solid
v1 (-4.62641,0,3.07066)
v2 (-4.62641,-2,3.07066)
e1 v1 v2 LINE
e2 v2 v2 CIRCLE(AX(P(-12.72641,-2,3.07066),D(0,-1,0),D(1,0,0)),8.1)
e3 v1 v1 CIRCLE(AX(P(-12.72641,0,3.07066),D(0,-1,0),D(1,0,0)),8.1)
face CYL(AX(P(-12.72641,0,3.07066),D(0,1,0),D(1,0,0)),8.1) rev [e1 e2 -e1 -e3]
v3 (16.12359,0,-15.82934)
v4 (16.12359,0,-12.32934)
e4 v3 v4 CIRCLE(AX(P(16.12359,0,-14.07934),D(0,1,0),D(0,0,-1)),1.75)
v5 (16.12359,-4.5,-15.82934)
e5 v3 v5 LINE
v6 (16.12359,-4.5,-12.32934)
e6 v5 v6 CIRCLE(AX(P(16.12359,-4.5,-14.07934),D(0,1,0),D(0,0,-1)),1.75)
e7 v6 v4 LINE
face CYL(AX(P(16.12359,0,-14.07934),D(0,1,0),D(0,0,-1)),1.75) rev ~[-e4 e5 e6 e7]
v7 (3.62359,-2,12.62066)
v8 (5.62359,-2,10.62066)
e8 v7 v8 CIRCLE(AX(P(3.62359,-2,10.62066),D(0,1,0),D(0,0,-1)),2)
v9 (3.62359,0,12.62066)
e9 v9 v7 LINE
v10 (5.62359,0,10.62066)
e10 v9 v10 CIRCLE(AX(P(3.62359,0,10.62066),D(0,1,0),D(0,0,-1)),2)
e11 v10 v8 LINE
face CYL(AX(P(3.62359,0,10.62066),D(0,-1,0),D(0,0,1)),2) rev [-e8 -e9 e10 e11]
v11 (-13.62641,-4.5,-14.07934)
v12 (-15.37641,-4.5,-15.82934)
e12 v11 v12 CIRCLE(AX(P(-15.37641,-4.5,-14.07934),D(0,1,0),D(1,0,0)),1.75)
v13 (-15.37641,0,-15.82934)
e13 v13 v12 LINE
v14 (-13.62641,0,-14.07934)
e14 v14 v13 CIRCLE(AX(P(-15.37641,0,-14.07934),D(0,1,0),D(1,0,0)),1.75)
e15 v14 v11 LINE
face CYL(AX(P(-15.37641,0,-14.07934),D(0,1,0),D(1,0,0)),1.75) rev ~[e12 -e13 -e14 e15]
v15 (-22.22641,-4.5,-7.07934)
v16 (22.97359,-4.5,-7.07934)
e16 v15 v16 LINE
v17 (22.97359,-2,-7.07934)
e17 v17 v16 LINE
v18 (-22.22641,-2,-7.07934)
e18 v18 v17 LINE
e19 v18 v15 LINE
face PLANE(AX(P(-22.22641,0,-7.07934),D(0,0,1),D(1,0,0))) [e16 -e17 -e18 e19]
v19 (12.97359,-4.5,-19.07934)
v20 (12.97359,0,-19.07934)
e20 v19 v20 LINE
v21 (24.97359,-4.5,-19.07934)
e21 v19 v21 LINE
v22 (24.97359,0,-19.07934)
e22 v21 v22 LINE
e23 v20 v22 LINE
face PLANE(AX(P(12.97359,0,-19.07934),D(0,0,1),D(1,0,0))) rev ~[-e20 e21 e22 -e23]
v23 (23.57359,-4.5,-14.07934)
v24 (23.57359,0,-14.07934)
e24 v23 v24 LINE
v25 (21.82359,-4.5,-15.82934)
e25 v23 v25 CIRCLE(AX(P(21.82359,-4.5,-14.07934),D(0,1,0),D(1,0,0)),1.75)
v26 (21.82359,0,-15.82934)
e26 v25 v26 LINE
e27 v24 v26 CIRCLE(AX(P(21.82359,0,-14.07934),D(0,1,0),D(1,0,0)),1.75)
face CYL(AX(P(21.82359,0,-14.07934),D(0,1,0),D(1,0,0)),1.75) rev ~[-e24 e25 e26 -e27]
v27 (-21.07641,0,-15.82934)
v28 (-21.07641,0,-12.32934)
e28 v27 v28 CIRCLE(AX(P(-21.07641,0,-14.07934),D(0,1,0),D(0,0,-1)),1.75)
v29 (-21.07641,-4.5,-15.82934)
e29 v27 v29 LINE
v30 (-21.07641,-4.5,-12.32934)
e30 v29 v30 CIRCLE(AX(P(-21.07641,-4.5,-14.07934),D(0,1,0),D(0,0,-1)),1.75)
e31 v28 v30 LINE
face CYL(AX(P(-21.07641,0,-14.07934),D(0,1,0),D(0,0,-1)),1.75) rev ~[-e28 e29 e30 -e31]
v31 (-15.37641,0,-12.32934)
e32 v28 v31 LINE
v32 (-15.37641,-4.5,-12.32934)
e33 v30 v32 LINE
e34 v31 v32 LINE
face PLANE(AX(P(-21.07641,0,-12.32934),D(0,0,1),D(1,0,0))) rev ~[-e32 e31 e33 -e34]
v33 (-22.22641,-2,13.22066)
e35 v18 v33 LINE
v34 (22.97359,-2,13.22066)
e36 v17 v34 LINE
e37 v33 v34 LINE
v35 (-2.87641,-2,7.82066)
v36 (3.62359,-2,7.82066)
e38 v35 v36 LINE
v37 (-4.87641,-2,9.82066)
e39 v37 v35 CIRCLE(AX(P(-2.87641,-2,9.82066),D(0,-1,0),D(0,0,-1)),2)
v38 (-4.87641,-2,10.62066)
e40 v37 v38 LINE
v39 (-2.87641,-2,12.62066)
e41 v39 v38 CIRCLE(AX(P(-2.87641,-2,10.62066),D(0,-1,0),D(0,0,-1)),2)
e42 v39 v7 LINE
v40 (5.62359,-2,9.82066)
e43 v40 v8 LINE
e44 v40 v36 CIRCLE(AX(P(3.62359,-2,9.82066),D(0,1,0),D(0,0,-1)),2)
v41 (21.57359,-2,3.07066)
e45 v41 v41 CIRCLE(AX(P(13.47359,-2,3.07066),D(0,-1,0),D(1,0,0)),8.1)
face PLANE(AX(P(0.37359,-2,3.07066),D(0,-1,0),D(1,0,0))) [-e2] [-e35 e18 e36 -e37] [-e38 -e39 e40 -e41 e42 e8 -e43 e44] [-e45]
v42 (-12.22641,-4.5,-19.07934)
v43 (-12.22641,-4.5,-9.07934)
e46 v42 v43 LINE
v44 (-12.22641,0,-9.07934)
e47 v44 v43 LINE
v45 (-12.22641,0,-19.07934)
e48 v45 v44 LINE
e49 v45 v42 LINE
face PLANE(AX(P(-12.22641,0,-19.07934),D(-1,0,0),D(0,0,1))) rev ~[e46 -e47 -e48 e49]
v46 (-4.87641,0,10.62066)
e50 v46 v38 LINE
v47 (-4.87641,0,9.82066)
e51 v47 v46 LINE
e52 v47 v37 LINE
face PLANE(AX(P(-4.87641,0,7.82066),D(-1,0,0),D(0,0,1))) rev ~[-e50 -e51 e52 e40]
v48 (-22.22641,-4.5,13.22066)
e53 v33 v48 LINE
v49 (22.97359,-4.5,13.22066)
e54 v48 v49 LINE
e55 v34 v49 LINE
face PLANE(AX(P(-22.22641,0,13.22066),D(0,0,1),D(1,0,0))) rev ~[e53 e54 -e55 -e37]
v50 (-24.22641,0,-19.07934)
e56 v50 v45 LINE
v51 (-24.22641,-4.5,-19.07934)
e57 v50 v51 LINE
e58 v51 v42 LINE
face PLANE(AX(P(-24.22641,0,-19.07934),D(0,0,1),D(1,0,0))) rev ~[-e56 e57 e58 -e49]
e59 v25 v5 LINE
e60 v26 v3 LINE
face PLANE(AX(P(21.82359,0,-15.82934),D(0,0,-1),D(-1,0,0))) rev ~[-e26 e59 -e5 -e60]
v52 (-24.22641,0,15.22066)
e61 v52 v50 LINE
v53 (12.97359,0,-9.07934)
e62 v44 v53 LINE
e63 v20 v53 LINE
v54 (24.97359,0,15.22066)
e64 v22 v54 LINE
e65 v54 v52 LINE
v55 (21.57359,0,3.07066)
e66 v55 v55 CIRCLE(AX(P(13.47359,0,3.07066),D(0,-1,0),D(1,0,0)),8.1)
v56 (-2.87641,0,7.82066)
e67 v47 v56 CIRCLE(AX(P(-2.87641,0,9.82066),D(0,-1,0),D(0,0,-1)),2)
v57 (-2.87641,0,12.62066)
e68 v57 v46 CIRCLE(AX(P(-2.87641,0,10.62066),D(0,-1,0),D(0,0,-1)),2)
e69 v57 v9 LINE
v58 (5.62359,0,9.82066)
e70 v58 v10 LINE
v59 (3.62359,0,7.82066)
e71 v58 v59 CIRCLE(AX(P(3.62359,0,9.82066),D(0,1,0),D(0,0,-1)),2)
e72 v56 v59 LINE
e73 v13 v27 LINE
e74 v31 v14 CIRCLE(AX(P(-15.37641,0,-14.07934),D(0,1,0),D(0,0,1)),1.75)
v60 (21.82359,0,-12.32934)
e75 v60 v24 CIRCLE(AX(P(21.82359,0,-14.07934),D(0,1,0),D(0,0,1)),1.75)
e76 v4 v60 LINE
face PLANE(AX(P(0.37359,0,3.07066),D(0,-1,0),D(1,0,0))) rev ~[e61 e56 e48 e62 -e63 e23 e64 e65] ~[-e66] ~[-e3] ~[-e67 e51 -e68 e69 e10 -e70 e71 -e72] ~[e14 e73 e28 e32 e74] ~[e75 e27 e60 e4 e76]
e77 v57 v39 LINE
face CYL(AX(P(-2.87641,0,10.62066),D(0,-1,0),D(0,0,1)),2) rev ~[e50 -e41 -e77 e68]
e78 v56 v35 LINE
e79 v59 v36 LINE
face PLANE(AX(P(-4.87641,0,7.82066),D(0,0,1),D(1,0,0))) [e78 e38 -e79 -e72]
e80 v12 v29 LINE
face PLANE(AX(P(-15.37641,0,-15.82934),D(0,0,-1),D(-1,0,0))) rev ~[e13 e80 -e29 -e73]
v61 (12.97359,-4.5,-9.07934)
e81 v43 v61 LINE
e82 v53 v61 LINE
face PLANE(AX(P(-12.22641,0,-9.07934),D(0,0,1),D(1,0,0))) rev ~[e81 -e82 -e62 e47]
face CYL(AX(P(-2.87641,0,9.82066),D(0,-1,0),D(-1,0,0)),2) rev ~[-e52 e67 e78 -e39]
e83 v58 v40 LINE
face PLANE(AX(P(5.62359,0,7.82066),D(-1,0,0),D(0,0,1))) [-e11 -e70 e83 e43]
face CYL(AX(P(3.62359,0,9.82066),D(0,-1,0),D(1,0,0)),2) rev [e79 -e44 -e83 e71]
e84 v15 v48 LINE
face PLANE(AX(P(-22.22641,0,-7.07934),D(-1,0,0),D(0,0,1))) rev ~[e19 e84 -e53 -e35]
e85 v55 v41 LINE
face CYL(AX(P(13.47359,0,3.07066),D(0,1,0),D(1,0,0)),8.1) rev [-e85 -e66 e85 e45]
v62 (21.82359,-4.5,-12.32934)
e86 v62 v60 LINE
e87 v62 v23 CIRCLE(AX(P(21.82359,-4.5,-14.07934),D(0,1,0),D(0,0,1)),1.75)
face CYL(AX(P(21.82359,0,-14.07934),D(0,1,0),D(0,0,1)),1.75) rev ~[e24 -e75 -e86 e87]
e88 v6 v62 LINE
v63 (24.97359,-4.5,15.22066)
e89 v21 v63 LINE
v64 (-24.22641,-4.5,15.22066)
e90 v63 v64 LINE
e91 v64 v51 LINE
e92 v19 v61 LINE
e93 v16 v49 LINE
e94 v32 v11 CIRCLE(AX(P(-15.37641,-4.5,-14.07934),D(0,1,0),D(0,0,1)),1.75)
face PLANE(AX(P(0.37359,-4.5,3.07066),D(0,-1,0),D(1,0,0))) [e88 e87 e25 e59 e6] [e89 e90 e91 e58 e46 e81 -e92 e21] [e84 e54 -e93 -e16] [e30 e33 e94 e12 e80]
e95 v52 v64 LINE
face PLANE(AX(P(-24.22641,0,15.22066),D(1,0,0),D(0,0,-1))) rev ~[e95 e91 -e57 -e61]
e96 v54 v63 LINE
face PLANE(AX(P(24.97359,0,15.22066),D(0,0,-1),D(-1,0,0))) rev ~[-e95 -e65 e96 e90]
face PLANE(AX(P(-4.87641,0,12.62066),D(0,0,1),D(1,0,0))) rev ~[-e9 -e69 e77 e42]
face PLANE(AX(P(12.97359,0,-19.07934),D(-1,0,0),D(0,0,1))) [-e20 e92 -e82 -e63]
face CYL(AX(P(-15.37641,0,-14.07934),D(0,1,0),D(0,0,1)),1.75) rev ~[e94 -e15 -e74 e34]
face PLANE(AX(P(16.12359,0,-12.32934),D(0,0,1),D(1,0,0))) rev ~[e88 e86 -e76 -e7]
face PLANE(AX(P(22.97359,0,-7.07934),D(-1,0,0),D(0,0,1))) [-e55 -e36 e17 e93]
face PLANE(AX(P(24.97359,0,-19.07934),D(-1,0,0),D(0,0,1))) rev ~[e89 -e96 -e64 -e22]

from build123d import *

# Parameters (mm, degrees)
F0_W     = 45.2
F0_H     = 20.3
F0_R     = 8.1
F0_W_2   = 10.5
F0_H_2   = 4.8
F1_DEPTH = 2
F0_W_3   = 12
F0_H_3   = 10
F2_DEPTH = 4.5
F3_R     = 2


# Not quite as in the source:
# - a feature names something its author has since deleted; it is built from what else it names


with BuildPart() as f1:
    # F0 (on Front) → F1 (new body)
    with BuildSketch(Plane.XZ):
        with Locations((0.3735902304, 3.0706598967)):
            Rectangle(F0_W, F0_H)
        with Locations((-12.7264097696, 3.0706598967)):
            Circle(F0_R, mode=Mode.SUBTRACT)
        with Locations((0.3735902304, 10.2206598967)):
            Rectangle(F0_W_2, F0_H_2, mode=Mode.SUBTRACT)
        with Locations((13.4735902304, 3.0706598967)):
            Circle(F0_R, mode=Mode.SUBTRACT)
    extrude(amount=F1_DEPTH)



with BuildPart() as f1b:
    # F0 (on Front) → F1, piece 2 (new body)
    with BuildSketch(Plane.XZ):
        with Locations((18.9735902304, -14.0793401033)):
            Rectangle(F0_W_3, F0_H_3)
        with BuildLine():
            ThreePointArc((16.1235902304, -15.8293401033), (14.3735902304, -14.0793401033), (16.1235902304, -12.3293401033))
            Line((16.1235902304, -12.3293401033), (21.8235902304, -12.3293401033))
            ThreePointArc((21.8235902304, -12.3293401033), (23.0610270975, -12.8419032362), (23.5735902304, -14.0793401033))
            ThreePointArc((23.5735902304, -14.0793401033), (23.0610270975, -15.3167769703), (21.8235902304, -15.8293401033))
            Line((21.8235902304, -15.8293401033), (16.1235902304, -15.8293401033))
        make_face(mode=Mode.SUBTRACT)
    extrude(amount=F1_DEPTH)


with BuildPart() as f1_1:
    add(f1.part)

    add(f1b.part)  # F2 merges F1b
    # F0 (on Front) → F2 (join)
    with BuildSketch(Plane.XZ):
        Polygon((24.9735902304, 15.2206598967), (-24.2264097696, 15.2206598967), (-24.2264097696, -9.0793401033), (-12.2264097696, -9.0793401033), (12.9735902304, -9.0793401033), (24.9735902304, -9.0793401033), align=None)
        with Locations((0.3735902304, 3.0706598967)):
            Rectangle(F0_W, F0_H, mode=Mode.SUBTRACT)
        with Locations((-18.2264097696, -14.0793401033)):
            Rectangle(F0_W_3, F0_H_3)
        with BuildLine():
            Line((-21.0764097696, -12.3293401033), (-15.3764097696, -12.3293401033))
            ThreePointArc((-15.3764097696, -12.3293401033), (-14.1389729025, -12.8419032362), (-13.6264097696, -14.0793401033))
            ThreePointArc((-13.6264097696, -14.0793401033), (-14.1389729025, -15.3167769703), (-15.3764097696, -15.8293401033))
            Line((-15.3764097696, -15.8293401033), (-21.0764097696, -15.8293401033))
            ThreePointArc((-21.0764097696, -15.8293401033), (-22.8264097696, -14.0793401033), (-21.0764097696, -12.3293401033))
        make_face(mode=Mode.SUBTRACT)
        with Locations((18.9735902304, -14.0793401033)):
            Rectangle(F0_W_3, F0_H_3)
        with BuildLine():
            ThreePointArc((16.1235902304, -15.8293401033), (14.3735902304, -14.0793401033), (16.1235902304, -12.3293401033))
            Line((16.1235902304, -12.3293401033), (21.8235902304, -12.3293401033))
            ThreePointArc((21.8235902304, -12.3293401033), (23.0610270975, -12.8419032362), (23.5735902304, -14.0793401033))
            ThreePointArc((23.5735902304, -14.0793401033), (23.0610270975, -15.3167769703), (21.8235902304, -15.8293401033))
            Line((21.8235902304, -15.8293401033), (16.1235902304, -15.8293401033))
        make_face(mode=Mode.SUBTRACT)
    extrude(amount=F2_DEPTH)

    # F3
    f3_edges = [f1_1.edges().sort_by_distance(p)[0] for p in [
        (-4.87641, -1, 7.82066),
        (-4.87641, -1, 12.62066),
        (5.62359, -1, 12.62066),
        (5.62359, -1, 7.82066),
    ]]
    fillet(f3_edges, radius=F3_R)


solid = f1_1.part
